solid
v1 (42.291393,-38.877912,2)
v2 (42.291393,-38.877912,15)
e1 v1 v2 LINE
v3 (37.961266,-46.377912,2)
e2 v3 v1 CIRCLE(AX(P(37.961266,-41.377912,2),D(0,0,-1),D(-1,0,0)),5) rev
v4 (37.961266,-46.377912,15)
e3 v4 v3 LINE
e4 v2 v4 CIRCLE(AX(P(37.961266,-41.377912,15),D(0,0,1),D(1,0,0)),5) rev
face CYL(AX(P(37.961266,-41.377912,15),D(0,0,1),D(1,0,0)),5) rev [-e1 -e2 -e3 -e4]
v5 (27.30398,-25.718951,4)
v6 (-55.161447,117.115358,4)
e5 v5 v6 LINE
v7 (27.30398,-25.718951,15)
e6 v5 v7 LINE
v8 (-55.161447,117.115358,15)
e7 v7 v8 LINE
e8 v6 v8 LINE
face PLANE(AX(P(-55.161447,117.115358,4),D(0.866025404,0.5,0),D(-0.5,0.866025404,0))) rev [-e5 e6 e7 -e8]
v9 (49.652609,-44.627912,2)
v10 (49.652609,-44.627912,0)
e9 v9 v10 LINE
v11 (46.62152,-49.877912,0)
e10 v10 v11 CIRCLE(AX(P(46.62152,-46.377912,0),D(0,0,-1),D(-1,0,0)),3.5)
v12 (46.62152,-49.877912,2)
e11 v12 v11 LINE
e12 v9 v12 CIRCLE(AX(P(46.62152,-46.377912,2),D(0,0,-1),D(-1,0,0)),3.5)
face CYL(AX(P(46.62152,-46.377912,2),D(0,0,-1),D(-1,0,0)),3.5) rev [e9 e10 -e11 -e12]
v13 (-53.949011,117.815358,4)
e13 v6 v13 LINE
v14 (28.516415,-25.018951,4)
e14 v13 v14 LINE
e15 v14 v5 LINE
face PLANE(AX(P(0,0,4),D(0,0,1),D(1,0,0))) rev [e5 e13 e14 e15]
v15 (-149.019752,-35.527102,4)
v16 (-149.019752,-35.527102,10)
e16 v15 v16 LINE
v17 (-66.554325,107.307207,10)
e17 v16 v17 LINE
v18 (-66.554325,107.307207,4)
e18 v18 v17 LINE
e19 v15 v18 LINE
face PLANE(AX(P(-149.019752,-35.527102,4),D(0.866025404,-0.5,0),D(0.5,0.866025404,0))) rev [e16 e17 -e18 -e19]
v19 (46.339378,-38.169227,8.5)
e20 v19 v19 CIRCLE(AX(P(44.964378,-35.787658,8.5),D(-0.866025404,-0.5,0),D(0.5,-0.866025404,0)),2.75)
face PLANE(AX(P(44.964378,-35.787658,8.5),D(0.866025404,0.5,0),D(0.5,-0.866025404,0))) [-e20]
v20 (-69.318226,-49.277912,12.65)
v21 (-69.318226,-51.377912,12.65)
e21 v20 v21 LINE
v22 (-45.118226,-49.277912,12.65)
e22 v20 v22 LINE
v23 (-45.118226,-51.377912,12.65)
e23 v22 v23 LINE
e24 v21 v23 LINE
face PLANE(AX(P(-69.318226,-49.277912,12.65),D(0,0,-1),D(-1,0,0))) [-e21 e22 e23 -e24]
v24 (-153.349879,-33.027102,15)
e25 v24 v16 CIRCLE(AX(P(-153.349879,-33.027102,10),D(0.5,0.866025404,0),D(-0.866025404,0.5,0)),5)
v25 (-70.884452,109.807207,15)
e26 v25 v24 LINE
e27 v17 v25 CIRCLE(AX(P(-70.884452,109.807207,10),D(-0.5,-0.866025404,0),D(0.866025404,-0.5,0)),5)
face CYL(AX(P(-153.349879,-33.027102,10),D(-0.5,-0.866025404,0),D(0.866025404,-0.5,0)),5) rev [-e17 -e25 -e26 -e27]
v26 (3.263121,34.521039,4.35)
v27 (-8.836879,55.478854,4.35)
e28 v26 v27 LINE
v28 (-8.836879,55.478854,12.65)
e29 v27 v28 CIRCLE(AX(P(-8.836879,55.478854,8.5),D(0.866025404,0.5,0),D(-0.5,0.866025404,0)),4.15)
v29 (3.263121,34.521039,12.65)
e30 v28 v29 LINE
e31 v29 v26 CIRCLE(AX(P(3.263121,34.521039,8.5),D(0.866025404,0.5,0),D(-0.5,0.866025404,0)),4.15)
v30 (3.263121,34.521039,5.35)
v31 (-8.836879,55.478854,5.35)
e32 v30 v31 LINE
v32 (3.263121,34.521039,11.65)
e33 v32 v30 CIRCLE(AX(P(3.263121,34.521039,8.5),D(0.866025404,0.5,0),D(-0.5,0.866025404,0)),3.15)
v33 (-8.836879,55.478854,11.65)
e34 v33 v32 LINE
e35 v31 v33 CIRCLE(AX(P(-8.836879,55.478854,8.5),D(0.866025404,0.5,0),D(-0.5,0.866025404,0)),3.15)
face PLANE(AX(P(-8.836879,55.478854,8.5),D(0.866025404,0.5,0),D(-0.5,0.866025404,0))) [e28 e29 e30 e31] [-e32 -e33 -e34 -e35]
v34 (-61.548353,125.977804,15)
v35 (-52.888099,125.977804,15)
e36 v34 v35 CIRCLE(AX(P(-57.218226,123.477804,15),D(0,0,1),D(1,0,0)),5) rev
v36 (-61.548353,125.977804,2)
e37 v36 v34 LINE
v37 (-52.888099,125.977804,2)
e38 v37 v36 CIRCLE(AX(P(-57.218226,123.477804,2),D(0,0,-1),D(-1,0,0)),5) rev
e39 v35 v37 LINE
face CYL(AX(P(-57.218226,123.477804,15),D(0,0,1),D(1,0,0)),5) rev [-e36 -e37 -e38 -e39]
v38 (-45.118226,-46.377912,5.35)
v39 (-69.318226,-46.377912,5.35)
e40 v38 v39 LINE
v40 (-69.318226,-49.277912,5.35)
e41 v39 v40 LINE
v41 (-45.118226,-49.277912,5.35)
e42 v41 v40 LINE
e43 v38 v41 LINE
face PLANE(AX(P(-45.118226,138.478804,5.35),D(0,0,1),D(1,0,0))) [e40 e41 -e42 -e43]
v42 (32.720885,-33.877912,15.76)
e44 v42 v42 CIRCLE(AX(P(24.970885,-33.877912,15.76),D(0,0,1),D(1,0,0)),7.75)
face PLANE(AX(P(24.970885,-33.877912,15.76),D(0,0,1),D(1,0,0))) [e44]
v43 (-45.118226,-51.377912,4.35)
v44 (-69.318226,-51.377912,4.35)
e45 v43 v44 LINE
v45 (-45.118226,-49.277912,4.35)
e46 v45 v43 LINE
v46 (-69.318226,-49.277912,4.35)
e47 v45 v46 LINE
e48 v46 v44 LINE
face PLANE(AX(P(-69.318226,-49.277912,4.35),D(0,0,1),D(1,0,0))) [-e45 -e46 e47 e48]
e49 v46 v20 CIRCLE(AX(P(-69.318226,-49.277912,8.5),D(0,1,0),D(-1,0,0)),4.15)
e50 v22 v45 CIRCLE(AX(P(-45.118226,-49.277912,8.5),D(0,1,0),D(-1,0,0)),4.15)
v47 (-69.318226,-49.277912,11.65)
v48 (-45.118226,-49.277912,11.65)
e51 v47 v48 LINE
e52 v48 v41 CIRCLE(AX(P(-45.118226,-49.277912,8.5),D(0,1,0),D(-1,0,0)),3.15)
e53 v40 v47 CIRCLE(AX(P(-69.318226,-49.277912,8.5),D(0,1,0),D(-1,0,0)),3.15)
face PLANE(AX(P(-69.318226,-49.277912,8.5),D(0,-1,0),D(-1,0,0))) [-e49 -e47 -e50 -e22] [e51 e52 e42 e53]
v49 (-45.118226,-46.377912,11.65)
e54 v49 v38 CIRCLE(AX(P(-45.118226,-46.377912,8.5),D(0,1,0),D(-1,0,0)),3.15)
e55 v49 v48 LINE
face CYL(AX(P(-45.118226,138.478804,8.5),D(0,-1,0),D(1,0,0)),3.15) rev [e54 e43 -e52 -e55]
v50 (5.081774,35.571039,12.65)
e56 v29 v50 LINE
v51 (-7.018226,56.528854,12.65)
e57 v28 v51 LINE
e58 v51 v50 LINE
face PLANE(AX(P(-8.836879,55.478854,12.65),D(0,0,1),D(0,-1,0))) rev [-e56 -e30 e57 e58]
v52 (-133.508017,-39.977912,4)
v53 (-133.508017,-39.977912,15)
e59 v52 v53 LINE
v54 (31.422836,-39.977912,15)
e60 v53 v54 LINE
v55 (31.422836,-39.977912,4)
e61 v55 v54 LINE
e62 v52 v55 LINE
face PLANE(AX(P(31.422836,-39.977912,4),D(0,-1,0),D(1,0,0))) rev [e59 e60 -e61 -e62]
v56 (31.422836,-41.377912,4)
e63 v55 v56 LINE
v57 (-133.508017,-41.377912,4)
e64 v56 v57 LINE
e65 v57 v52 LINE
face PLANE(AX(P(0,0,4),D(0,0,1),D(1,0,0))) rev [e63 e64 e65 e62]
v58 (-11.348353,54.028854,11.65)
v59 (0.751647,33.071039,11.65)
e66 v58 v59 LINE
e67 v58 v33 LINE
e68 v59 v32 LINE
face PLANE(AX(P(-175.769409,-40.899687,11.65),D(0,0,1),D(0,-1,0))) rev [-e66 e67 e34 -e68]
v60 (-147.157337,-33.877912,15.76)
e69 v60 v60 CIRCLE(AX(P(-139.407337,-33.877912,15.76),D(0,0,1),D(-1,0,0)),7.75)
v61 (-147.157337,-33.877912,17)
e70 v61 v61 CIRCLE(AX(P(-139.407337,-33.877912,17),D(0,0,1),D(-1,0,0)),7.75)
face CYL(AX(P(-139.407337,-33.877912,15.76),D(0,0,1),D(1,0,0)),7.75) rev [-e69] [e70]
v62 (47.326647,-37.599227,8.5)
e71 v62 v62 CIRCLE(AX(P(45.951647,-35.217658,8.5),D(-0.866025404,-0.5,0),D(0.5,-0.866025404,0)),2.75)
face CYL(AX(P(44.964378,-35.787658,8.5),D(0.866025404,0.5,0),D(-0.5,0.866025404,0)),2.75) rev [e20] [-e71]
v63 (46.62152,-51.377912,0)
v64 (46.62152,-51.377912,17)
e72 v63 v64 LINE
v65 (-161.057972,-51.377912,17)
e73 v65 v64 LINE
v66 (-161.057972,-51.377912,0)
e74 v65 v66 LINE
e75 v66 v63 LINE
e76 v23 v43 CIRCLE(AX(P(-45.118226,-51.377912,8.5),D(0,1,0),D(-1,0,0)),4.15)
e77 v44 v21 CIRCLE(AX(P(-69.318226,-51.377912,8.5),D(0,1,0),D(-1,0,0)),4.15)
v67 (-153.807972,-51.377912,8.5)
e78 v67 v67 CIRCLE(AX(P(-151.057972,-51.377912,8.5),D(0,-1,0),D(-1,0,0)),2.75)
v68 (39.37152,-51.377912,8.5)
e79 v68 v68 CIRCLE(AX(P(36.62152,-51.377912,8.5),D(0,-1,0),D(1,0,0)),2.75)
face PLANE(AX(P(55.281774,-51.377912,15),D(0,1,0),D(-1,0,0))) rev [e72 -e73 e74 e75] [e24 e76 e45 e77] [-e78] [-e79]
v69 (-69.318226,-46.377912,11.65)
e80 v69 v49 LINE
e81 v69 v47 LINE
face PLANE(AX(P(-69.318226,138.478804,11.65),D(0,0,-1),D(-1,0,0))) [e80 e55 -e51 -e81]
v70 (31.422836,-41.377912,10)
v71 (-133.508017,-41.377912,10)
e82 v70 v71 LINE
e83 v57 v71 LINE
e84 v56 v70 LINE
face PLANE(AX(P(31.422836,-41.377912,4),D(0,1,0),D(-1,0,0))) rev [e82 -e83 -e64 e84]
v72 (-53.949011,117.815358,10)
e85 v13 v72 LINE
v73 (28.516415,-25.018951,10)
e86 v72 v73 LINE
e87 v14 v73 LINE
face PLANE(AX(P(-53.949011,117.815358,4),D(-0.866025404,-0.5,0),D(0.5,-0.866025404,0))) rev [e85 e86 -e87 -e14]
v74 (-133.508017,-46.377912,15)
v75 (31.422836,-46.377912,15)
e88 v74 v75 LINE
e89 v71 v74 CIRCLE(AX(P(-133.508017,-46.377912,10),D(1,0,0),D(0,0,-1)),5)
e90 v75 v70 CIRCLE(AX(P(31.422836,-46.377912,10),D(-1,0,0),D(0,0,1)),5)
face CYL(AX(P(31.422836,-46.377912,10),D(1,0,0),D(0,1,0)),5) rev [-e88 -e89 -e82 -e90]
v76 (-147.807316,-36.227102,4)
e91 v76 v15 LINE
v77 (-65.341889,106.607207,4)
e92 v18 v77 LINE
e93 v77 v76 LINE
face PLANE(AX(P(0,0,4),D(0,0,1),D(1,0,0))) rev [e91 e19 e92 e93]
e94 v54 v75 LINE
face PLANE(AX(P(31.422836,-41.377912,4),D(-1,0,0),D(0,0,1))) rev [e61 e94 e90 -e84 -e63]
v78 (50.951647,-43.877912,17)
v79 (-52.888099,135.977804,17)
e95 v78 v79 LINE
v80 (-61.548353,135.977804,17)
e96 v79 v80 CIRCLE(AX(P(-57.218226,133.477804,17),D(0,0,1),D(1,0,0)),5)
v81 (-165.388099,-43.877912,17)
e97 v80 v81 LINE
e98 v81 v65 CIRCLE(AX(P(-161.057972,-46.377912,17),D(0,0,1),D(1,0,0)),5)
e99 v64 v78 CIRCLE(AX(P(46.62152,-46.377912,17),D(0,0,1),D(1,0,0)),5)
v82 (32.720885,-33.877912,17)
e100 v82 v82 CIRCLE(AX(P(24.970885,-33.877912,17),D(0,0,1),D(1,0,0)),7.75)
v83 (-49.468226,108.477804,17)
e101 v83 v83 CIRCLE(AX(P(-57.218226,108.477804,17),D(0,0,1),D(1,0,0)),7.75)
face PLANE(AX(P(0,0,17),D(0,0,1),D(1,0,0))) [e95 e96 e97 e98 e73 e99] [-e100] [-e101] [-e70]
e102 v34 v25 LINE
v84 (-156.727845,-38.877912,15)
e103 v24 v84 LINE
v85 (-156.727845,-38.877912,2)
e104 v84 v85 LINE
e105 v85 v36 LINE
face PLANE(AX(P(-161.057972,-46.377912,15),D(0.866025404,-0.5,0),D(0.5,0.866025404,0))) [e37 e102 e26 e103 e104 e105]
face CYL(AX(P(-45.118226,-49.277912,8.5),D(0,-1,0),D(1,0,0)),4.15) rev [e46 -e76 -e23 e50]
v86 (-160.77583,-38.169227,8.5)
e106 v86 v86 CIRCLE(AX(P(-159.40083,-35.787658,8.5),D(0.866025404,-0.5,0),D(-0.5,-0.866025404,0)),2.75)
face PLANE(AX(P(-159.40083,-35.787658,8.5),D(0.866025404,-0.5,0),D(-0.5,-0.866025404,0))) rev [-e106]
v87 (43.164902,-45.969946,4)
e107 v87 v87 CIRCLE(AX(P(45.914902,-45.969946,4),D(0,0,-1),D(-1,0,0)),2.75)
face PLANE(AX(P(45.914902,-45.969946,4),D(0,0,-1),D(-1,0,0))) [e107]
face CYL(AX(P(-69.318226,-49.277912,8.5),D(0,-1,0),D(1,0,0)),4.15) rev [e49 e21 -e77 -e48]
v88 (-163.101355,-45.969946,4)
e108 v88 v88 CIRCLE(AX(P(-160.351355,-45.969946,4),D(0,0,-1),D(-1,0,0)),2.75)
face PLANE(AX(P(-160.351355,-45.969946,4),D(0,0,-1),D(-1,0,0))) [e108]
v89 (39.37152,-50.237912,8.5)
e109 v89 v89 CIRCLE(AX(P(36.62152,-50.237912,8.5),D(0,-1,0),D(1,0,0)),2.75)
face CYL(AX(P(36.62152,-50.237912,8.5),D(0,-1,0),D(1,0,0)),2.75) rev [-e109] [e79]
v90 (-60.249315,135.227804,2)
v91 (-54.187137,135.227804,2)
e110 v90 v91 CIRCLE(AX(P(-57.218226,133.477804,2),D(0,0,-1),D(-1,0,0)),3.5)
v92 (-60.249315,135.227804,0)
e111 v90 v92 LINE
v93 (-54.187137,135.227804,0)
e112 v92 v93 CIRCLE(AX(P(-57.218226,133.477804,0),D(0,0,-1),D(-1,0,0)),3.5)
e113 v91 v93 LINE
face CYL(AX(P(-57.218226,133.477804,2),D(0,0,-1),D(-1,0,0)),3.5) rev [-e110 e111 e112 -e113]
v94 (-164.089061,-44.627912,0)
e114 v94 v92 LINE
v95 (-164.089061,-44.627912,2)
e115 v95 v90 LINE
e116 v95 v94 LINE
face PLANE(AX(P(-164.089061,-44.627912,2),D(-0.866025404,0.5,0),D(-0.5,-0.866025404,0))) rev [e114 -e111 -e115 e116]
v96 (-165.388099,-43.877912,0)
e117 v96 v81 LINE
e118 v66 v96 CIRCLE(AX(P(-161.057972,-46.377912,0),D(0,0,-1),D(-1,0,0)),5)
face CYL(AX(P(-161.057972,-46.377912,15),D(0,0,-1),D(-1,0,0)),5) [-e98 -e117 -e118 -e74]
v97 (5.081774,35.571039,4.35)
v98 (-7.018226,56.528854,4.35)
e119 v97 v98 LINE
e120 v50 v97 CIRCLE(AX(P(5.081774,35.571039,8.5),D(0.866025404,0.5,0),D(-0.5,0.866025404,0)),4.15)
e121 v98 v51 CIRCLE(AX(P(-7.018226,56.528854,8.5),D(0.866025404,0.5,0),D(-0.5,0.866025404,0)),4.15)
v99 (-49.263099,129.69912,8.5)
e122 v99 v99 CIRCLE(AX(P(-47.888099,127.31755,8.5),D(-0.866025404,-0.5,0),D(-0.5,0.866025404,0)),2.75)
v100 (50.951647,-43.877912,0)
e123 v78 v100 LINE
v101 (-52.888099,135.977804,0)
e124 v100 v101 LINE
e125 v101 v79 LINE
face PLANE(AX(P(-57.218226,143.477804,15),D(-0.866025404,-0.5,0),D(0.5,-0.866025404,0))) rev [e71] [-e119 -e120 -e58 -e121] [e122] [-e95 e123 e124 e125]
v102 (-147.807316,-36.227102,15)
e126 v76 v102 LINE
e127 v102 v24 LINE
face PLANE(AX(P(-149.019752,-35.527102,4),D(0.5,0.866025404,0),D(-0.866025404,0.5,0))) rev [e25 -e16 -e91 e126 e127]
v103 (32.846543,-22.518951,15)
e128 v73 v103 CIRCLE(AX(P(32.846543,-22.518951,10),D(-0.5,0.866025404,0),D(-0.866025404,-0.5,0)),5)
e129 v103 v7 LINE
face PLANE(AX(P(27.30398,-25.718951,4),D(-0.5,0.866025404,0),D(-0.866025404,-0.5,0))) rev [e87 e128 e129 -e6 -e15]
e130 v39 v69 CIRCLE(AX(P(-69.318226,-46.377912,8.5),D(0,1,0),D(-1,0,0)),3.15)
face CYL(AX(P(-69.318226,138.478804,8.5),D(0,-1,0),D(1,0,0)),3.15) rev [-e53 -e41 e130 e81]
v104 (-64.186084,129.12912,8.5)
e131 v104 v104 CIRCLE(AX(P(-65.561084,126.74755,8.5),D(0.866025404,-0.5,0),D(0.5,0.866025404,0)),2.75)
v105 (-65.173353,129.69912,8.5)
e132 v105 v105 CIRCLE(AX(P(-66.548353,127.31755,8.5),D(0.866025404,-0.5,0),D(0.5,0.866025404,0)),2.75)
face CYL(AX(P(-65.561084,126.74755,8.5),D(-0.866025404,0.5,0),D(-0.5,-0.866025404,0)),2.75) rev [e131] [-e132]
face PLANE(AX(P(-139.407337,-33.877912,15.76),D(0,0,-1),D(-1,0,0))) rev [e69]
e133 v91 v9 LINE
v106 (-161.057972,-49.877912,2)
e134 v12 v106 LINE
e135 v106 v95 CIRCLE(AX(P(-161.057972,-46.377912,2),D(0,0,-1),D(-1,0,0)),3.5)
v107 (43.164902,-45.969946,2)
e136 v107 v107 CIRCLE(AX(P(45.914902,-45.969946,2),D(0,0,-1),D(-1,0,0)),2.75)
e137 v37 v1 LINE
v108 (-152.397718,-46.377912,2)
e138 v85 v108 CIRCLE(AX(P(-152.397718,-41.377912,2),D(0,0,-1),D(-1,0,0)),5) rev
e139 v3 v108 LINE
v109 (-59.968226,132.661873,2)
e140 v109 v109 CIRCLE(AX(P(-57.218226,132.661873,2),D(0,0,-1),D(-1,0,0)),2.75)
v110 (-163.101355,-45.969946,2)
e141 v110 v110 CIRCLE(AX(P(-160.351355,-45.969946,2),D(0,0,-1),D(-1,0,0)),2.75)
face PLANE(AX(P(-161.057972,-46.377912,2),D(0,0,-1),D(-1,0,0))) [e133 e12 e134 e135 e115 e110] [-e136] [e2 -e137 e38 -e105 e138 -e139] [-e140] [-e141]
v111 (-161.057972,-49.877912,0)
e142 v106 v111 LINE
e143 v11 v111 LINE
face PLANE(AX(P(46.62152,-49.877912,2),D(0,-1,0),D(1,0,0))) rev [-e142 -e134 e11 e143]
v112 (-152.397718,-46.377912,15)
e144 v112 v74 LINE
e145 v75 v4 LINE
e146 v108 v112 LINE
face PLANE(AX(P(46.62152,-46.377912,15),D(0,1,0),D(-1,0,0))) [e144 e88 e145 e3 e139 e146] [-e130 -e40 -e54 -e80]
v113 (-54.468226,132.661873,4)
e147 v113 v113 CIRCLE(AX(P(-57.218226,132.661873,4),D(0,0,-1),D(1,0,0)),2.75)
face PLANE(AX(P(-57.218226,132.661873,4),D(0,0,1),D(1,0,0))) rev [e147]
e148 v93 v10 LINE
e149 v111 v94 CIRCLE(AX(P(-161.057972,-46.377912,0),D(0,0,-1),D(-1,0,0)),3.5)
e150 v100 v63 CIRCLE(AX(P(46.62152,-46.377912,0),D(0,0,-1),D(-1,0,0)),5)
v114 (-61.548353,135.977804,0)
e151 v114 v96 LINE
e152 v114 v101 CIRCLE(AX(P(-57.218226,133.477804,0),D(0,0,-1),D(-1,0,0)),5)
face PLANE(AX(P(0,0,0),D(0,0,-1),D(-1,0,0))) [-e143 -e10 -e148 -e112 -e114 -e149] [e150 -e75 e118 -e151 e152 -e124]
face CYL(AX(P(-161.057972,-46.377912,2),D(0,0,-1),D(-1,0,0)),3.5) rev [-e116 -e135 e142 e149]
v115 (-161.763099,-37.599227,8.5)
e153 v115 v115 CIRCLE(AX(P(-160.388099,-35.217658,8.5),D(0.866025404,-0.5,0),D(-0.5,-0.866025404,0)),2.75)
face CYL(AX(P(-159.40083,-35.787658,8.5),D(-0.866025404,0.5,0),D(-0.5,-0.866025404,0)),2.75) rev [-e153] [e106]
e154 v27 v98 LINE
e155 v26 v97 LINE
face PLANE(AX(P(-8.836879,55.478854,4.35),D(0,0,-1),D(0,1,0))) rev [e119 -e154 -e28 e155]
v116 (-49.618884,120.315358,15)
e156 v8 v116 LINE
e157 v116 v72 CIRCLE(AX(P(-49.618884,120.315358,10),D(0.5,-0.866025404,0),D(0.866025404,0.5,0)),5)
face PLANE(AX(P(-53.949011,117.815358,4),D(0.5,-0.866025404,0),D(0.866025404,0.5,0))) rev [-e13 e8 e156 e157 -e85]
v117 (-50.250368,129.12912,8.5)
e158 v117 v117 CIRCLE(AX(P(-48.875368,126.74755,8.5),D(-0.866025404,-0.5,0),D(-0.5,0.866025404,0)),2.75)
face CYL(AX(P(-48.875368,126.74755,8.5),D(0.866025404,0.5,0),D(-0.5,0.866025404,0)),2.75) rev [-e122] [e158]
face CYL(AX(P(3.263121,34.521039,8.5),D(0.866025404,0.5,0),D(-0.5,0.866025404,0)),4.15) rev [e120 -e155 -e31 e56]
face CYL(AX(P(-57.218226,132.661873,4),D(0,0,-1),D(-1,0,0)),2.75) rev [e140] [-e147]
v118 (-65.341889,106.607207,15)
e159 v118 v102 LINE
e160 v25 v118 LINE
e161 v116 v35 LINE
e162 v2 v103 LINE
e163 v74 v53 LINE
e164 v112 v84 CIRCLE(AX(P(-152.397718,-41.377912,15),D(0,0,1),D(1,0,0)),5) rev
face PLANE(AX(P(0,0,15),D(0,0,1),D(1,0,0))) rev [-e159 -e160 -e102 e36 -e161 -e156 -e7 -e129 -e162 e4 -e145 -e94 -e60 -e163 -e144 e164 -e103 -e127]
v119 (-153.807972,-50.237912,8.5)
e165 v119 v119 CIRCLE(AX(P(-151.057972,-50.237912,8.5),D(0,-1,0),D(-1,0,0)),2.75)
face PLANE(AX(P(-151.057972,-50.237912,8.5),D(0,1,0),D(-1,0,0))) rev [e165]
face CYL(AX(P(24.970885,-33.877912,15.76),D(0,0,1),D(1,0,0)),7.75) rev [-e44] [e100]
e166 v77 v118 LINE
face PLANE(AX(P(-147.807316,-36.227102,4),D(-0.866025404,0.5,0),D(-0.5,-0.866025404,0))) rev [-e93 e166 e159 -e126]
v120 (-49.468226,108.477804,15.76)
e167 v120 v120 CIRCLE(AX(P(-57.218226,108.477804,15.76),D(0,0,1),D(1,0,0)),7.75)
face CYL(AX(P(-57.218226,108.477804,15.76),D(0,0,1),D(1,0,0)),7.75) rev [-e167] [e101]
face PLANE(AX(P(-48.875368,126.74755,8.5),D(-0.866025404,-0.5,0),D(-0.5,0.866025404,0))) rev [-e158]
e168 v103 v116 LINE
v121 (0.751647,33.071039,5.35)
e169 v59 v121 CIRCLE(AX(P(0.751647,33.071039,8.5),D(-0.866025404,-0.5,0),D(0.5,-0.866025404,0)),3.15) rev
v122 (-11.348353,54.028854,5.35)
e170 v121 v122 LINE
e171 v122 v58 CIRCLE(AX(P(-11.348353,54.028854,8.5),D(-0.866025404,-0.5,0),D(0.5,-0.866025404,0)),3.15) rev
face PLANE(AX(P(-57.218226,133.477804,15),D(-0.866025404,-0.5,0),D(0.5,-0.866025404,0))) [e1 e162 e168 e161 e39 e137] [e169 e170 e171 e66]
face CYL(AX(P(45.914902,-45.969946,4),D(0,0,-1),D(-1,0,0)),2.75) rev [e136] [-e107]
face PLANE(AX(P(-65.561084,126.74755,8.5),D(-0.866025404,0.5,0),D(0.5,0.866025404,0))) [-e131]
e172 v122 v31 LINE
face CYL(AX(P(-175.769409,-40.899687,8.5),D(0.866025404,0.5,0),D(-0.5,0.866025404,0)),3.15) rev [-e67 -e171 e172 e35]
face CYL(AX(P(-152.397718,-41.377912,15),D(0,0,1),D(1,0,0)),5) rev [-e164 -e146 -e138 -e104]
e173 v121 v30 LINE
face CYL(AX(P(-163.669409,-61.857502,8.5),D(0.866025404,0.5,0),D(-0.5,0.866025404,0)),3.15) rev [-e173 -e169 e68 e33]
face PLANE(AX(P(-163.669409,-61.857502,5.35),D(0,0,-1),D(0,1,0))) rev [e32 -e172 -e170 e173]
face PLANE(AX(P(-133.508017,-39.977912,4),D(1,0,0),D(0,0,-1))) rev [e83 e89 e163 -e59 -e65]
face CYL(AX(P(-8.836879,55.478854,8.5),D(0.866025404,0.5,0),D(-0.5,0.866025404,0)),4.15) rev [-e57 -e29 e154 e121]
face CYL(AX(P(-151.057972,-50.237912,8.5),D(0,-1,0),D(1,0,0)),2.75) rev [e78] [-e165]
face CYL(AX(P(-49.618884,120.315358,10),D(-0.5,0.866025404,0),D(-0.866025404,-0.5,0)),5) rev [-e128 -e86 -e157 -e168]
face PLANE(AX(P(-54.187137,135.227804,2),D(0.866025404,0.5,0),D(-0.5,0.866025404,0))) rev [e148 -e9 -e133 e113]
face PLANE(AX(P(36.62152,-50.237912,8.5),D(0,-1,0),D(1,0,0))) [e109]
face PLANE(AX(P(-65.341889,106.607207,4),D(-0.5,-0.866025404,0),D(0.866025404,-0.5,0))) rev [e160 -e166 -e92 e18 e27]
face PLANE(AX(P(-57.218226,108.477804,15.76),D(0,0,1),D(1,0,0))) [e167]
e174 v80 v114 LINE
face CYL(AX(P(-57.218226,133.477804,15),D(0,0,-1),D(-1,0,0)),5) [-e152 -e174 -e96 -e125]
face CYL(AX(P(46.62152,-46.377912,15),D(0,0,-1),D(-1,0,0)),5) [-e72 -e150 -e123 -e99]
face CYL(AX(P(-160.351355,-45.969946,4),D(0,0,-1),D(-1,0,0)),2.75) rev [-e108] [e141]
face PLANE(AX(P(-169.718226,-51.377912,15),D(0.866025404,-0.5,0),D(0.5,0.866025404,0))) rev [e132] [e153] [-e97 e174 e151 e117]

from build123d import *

# Parameters (mm, degrees)
BOSS_EXTRU_1_DEPTH      = 15
BOSS_EXTRU_2_DEPTH      = 2
ESQUISSE3_W             = 164.930853143
ESQUISSE3_H             = 1.4
BOSS_EXTRU_3_DEPTH      = 11
ENL_V_MAT_EXTRU_1_DEPTH = 2.1
ENL_V_MAT_EXTRU_2_REACH = 232.446
CONG_1_R                = 5
ESQUISSE6_R             = 7.75
ENL_V_MAT_EXTRU_3_DEPTH = 1.24
ESQUISSE7_R             = 2.75
ENL_V_MAT_EXTRU_4_DEPTH = 1.14
CONG_2_R                = 5
ENL_V_MAT_EXTRU_6_DEPTH = 2
ESQUISSE8_R             = 2.75
ENL_V_MAT_EXTRU_5_DEPTH = 4


with BuildPart() as part:
    # Esquisse1 → Boss.-Extru.1 (new body)
    with BuildSketch(Plane.XY):
        Polygon((-169.71822613, -51.377911564), (-57.21822613, 143.477804287), (55.28177387, -51.377911564), align=None)
        Polygon((46.621519833, -46.377911564), (-161.057972092, -46.377911564), (-57.21822613, 133.477804287), align=None, mode=Mode.SUBTRACT)
    extrude(amount=BOSS_EXTRU_1_DEPTH)

    # Esquisse2 → Boss.-Extru.2 (add)
    with BuildSketch(Plane.XY.offset(15)):
        Polygon((-57.21822613, 143.477804287), (-169.71822613, -51.377911564), (55.28177387, -51.377911564), align=None)
    extrude(amount=BOSS_EXTRU_2_DEPTH)

    # Esquisse3 → Boss.-Extru.3 (add)
    with BuildSketch(Plane(origin=(0, 0, 15), x_dir=(-1, 0, 0), z_dir=(0, 0, -1))):
        Polygon((53.949011072, 117.815357706), (-28.5164155, -25.018950984), (-27.303979934, -25.718950984), (55.161446637, 117.115357706), align=None)
        Polygon((149.019751584, -35.527102012), (147.807316018, -36.227102012), (65.341889447, 106.607206677), (66.554325012, 107.307206677), align=None)
        with Locations((51.042590893, -40.677911564)):
            Rectangle(ESQUISSE3_W, ESQUISSE3_H)
    extrude(amount=BOSS_EXTRU_3_DEPTH)

    # Esquisse4 → Enlèv. mat.-Extru.1 (cut)
    with BuildSketch(Plane(origin=(19.214042099, 11.093232378, 0), x_dir=(0, 0, -1), z_dir=(0.8660254037844387, 0.5000000000000001, 0))):
        with BuildLine():
            Line((-12.65, 52.464536457), (-12.65, 28.264536457))
            ThreePointArc((-12.65, 28.264536457), (-8.5, 24.114536457), (-4.35, 28.264536457))
            Line((-4.35, 28.264536457), (-4.35, 52.464536457))
            ThreePointArc((-4.35, 52.464536457), (-8.5, 56.614536457), (-12.65, 52.464536457))
        make_face()
    enl_v_mat_extru_1 = extrude(amount=-ENL_V_MAT_EXTRU_1_DEPTH, mode=Mode.SUBTRACT)

    # Esquisse5 → Enlèv. mat.-Extru.2 (cut, up to next)
    with BuildSketch(Plane(origin=(17.395388751, 10.043232378, 0), x_dir=(0, 0, -1), z_dir=(0.8660254037844386, 0.5000000000000003, 0)), mode=Mode.PRIVATE) as enl_v_mat_extru_2_sk1:
        with BuildLine():
            Line((-11.65, 52.464536457), (-11.65, 28.264536457))
            ThreePointArc((-11.65, 28.264536457), (-8.5, 25.114536457), (-5.35, 28.264536457))
            Line((-5.35, 28.264536457), (-5.35, 52.464536457))
            ThreePointArc((-5.35, 52.464536457), (-8.5, 55.614536457), (-11.65, 52.464536457))
        make_face()
    enl_v_mat_extru_2_tool1 = extrude(enl_v_mat_extru_2_sk1.sketch, amount=-ENL_V_MAT_EXTRU_2_REACH, mode=Mode.PRIVATE) & part.part
    enl_v_mat_extru_2 = enl_v_mat_extru_2_tool1.solids().sort_by_distance((-2.786879, 44.999946, 8.5))[0]
    add(enl_v_mat_extru_2, mode=Mode.SUBTRACT)

    # Congé1
    cong_1_edges = [part.edges().sort_by_distance(p)[0] for p in [
        (46.621519833, -46.377911564, 7.5),
        (-57.21822613, 133.477804287, 7.5),
        (-161.057972092, -46.377911564, 7.5),
        (-169.71822613, -51.377911564, 8.5),
        (-57.21822613, 143.477804287, 8.5),
        (55.28177387, -51.377911564, 8.5),
    ]]
    fillet(cong_1_edges, radius=CONG_1_R)

    # Symétrie1: Enlèv. mat.-Extru.1, Enlèv. mat.-Extru.2 across plane
    add(enl_v_mat_extru_1.mirror(Plane(origin=(-8.426844836, -14.595723404, 0), x_dir=(0, 0, 1), z_dir=(0.5000000000000001, 0.8660254037844386, 0))), mode=Mode.SUBTRACT)
    add(enl_v_mat_extru_2.mirror(Plane(origin=(-8.426844836, -14.595723404, 0), x_dir=(0, 0, 1), z_dir=(0.5000000000000001, 0.8660254037844386, 0))), mode=Mode.SUBTRACT)

    # Esquisse6 → Enlèv. mat.-Extru.3 (cut)
    with BuildSketch(Plane.XY.offset(17)):
        with Locations((-57.21822613, 108.477804287)):
            Circle(ESQUISSE6_R)
        with Locations(Location((-139.407336997, -33.877911564, 0), (0, 0, 180))):
            Circle(ESQUISSE6_R)
        with Locations((24.970884738, -33.877911564)):
            Circle(ESQUISSE6_R)
    extrude(amount=-ENL_V_MAT_EXTRU_3_DEPTH, mode=Mode.SUBTRACT)

    # Esquisse7 → Enlèv. mat.-Extru.4 (cut)
    with BuildSketch(Plane.XZ.offset(51.377911564)):
        with Locations((36.621519833, 8.5)):
            Circle(ESQUISSE7_R)
        with Locations(Location((-151.057972092, 8.5, 0), (0, 0, 180))):
            Circle(ESQUISSE7_R)
    enl_v_mat_extru_4 = extrude(amount=-ENL_V_MAT_EXTRU_4_DEPTH, mode=Mode.SUBTRACT)

    # Symétrie2: Enlèv. mat.-Extru.4 across plane
    add(enl_v_mat_extru_4.mirror(Plane(origin=(-8.426844836, -14.595723404, 0), x_dir=(0, 0, 1), z_dir=(0.5000000000000001, 0.8660254037844386, 0))), mode=Mode.SUBTRACT)

    # Symétrie3: Enlèv. mat.-Extru.4 across plane
    add(enl_v_mat_extru_4.mirror(Plane(origin=(-20.182268228, 34.956713983, 0), x_dir=(0, 0, 1), z_dir=(0.5000000000000001, -0.8660254037844387, 0))), mode=Mode.SUBTRACT)

    # Congé2
    cong_2_edges = [part.edges().sort_by_distance(p)[0] for p in [
        (-12.716297786, 46.398203361, 15),
        (-107.787038298, 35.890052333, 15),
        (-51.042590892, -41.377911564, 15),
    ]]
    fillet(cong_2_edges, radius=CONG_2_R - 0.0001)  # a hair under: the kernel refuses the full size

    # Esquisse9 → Enlèv. mat.-Extru.6 (cut)
    with BuildSketch(Plane(origin=(0, 0, 0), x_dir=(-1, 0, 0), z_dir=(0, 0, -1))):
        with BuildLine():
            Line((164.089061005, -44.627911564), (60.249315043, 135.227804287))
            ThreePointArc((60.249315043, 135.227804287), (57.21822613, 136.977804287), (54.187137216, 135.227804287))
            Line((54.187137216, 135.227804287), (-49.652608746, -44.627911564))
            ThreePointArc((-49.652608746, -44.627911564), (-49.652608746, -48.127911564), (-46.621519833, -49.877911564))
            Line((-46.621519833, -49.877911564), (161.057972092, -49.877911564))
            ThreePointArc((161.057972092, -49.877911564), (164.089061005, -48.127911564), (164.089061005, -44.627911564))
        make_face()
    extrude(amount=-ENL_V_MAT_EXTRU_6_DEPTH, mode=Mode.SUBTRACT)

    # Esquisse8 → Enlèv. mat.-Extru.5 (cut)
    with BuildSketch(Plane(origin=(0, 0, 0), x_dir=(-1, 0, 0), z_dir=(0, 0, -1))):
        with Locations((-45.914902423, -45.969945813)):
            Circle(ESQUISSE8_R)
        with Locations((57.21822613, 132.661872783)):
            Circle(ESQUISSE8_R)
        with Locations((160.351354682, -45.969945813)):
            Circle(ESQUISSE8_R)
    extrude(amount=-ENL_V_MAT_EXTRU_5_DEPTH, mode=Mode.SUBTRACT)


solid = part.part
